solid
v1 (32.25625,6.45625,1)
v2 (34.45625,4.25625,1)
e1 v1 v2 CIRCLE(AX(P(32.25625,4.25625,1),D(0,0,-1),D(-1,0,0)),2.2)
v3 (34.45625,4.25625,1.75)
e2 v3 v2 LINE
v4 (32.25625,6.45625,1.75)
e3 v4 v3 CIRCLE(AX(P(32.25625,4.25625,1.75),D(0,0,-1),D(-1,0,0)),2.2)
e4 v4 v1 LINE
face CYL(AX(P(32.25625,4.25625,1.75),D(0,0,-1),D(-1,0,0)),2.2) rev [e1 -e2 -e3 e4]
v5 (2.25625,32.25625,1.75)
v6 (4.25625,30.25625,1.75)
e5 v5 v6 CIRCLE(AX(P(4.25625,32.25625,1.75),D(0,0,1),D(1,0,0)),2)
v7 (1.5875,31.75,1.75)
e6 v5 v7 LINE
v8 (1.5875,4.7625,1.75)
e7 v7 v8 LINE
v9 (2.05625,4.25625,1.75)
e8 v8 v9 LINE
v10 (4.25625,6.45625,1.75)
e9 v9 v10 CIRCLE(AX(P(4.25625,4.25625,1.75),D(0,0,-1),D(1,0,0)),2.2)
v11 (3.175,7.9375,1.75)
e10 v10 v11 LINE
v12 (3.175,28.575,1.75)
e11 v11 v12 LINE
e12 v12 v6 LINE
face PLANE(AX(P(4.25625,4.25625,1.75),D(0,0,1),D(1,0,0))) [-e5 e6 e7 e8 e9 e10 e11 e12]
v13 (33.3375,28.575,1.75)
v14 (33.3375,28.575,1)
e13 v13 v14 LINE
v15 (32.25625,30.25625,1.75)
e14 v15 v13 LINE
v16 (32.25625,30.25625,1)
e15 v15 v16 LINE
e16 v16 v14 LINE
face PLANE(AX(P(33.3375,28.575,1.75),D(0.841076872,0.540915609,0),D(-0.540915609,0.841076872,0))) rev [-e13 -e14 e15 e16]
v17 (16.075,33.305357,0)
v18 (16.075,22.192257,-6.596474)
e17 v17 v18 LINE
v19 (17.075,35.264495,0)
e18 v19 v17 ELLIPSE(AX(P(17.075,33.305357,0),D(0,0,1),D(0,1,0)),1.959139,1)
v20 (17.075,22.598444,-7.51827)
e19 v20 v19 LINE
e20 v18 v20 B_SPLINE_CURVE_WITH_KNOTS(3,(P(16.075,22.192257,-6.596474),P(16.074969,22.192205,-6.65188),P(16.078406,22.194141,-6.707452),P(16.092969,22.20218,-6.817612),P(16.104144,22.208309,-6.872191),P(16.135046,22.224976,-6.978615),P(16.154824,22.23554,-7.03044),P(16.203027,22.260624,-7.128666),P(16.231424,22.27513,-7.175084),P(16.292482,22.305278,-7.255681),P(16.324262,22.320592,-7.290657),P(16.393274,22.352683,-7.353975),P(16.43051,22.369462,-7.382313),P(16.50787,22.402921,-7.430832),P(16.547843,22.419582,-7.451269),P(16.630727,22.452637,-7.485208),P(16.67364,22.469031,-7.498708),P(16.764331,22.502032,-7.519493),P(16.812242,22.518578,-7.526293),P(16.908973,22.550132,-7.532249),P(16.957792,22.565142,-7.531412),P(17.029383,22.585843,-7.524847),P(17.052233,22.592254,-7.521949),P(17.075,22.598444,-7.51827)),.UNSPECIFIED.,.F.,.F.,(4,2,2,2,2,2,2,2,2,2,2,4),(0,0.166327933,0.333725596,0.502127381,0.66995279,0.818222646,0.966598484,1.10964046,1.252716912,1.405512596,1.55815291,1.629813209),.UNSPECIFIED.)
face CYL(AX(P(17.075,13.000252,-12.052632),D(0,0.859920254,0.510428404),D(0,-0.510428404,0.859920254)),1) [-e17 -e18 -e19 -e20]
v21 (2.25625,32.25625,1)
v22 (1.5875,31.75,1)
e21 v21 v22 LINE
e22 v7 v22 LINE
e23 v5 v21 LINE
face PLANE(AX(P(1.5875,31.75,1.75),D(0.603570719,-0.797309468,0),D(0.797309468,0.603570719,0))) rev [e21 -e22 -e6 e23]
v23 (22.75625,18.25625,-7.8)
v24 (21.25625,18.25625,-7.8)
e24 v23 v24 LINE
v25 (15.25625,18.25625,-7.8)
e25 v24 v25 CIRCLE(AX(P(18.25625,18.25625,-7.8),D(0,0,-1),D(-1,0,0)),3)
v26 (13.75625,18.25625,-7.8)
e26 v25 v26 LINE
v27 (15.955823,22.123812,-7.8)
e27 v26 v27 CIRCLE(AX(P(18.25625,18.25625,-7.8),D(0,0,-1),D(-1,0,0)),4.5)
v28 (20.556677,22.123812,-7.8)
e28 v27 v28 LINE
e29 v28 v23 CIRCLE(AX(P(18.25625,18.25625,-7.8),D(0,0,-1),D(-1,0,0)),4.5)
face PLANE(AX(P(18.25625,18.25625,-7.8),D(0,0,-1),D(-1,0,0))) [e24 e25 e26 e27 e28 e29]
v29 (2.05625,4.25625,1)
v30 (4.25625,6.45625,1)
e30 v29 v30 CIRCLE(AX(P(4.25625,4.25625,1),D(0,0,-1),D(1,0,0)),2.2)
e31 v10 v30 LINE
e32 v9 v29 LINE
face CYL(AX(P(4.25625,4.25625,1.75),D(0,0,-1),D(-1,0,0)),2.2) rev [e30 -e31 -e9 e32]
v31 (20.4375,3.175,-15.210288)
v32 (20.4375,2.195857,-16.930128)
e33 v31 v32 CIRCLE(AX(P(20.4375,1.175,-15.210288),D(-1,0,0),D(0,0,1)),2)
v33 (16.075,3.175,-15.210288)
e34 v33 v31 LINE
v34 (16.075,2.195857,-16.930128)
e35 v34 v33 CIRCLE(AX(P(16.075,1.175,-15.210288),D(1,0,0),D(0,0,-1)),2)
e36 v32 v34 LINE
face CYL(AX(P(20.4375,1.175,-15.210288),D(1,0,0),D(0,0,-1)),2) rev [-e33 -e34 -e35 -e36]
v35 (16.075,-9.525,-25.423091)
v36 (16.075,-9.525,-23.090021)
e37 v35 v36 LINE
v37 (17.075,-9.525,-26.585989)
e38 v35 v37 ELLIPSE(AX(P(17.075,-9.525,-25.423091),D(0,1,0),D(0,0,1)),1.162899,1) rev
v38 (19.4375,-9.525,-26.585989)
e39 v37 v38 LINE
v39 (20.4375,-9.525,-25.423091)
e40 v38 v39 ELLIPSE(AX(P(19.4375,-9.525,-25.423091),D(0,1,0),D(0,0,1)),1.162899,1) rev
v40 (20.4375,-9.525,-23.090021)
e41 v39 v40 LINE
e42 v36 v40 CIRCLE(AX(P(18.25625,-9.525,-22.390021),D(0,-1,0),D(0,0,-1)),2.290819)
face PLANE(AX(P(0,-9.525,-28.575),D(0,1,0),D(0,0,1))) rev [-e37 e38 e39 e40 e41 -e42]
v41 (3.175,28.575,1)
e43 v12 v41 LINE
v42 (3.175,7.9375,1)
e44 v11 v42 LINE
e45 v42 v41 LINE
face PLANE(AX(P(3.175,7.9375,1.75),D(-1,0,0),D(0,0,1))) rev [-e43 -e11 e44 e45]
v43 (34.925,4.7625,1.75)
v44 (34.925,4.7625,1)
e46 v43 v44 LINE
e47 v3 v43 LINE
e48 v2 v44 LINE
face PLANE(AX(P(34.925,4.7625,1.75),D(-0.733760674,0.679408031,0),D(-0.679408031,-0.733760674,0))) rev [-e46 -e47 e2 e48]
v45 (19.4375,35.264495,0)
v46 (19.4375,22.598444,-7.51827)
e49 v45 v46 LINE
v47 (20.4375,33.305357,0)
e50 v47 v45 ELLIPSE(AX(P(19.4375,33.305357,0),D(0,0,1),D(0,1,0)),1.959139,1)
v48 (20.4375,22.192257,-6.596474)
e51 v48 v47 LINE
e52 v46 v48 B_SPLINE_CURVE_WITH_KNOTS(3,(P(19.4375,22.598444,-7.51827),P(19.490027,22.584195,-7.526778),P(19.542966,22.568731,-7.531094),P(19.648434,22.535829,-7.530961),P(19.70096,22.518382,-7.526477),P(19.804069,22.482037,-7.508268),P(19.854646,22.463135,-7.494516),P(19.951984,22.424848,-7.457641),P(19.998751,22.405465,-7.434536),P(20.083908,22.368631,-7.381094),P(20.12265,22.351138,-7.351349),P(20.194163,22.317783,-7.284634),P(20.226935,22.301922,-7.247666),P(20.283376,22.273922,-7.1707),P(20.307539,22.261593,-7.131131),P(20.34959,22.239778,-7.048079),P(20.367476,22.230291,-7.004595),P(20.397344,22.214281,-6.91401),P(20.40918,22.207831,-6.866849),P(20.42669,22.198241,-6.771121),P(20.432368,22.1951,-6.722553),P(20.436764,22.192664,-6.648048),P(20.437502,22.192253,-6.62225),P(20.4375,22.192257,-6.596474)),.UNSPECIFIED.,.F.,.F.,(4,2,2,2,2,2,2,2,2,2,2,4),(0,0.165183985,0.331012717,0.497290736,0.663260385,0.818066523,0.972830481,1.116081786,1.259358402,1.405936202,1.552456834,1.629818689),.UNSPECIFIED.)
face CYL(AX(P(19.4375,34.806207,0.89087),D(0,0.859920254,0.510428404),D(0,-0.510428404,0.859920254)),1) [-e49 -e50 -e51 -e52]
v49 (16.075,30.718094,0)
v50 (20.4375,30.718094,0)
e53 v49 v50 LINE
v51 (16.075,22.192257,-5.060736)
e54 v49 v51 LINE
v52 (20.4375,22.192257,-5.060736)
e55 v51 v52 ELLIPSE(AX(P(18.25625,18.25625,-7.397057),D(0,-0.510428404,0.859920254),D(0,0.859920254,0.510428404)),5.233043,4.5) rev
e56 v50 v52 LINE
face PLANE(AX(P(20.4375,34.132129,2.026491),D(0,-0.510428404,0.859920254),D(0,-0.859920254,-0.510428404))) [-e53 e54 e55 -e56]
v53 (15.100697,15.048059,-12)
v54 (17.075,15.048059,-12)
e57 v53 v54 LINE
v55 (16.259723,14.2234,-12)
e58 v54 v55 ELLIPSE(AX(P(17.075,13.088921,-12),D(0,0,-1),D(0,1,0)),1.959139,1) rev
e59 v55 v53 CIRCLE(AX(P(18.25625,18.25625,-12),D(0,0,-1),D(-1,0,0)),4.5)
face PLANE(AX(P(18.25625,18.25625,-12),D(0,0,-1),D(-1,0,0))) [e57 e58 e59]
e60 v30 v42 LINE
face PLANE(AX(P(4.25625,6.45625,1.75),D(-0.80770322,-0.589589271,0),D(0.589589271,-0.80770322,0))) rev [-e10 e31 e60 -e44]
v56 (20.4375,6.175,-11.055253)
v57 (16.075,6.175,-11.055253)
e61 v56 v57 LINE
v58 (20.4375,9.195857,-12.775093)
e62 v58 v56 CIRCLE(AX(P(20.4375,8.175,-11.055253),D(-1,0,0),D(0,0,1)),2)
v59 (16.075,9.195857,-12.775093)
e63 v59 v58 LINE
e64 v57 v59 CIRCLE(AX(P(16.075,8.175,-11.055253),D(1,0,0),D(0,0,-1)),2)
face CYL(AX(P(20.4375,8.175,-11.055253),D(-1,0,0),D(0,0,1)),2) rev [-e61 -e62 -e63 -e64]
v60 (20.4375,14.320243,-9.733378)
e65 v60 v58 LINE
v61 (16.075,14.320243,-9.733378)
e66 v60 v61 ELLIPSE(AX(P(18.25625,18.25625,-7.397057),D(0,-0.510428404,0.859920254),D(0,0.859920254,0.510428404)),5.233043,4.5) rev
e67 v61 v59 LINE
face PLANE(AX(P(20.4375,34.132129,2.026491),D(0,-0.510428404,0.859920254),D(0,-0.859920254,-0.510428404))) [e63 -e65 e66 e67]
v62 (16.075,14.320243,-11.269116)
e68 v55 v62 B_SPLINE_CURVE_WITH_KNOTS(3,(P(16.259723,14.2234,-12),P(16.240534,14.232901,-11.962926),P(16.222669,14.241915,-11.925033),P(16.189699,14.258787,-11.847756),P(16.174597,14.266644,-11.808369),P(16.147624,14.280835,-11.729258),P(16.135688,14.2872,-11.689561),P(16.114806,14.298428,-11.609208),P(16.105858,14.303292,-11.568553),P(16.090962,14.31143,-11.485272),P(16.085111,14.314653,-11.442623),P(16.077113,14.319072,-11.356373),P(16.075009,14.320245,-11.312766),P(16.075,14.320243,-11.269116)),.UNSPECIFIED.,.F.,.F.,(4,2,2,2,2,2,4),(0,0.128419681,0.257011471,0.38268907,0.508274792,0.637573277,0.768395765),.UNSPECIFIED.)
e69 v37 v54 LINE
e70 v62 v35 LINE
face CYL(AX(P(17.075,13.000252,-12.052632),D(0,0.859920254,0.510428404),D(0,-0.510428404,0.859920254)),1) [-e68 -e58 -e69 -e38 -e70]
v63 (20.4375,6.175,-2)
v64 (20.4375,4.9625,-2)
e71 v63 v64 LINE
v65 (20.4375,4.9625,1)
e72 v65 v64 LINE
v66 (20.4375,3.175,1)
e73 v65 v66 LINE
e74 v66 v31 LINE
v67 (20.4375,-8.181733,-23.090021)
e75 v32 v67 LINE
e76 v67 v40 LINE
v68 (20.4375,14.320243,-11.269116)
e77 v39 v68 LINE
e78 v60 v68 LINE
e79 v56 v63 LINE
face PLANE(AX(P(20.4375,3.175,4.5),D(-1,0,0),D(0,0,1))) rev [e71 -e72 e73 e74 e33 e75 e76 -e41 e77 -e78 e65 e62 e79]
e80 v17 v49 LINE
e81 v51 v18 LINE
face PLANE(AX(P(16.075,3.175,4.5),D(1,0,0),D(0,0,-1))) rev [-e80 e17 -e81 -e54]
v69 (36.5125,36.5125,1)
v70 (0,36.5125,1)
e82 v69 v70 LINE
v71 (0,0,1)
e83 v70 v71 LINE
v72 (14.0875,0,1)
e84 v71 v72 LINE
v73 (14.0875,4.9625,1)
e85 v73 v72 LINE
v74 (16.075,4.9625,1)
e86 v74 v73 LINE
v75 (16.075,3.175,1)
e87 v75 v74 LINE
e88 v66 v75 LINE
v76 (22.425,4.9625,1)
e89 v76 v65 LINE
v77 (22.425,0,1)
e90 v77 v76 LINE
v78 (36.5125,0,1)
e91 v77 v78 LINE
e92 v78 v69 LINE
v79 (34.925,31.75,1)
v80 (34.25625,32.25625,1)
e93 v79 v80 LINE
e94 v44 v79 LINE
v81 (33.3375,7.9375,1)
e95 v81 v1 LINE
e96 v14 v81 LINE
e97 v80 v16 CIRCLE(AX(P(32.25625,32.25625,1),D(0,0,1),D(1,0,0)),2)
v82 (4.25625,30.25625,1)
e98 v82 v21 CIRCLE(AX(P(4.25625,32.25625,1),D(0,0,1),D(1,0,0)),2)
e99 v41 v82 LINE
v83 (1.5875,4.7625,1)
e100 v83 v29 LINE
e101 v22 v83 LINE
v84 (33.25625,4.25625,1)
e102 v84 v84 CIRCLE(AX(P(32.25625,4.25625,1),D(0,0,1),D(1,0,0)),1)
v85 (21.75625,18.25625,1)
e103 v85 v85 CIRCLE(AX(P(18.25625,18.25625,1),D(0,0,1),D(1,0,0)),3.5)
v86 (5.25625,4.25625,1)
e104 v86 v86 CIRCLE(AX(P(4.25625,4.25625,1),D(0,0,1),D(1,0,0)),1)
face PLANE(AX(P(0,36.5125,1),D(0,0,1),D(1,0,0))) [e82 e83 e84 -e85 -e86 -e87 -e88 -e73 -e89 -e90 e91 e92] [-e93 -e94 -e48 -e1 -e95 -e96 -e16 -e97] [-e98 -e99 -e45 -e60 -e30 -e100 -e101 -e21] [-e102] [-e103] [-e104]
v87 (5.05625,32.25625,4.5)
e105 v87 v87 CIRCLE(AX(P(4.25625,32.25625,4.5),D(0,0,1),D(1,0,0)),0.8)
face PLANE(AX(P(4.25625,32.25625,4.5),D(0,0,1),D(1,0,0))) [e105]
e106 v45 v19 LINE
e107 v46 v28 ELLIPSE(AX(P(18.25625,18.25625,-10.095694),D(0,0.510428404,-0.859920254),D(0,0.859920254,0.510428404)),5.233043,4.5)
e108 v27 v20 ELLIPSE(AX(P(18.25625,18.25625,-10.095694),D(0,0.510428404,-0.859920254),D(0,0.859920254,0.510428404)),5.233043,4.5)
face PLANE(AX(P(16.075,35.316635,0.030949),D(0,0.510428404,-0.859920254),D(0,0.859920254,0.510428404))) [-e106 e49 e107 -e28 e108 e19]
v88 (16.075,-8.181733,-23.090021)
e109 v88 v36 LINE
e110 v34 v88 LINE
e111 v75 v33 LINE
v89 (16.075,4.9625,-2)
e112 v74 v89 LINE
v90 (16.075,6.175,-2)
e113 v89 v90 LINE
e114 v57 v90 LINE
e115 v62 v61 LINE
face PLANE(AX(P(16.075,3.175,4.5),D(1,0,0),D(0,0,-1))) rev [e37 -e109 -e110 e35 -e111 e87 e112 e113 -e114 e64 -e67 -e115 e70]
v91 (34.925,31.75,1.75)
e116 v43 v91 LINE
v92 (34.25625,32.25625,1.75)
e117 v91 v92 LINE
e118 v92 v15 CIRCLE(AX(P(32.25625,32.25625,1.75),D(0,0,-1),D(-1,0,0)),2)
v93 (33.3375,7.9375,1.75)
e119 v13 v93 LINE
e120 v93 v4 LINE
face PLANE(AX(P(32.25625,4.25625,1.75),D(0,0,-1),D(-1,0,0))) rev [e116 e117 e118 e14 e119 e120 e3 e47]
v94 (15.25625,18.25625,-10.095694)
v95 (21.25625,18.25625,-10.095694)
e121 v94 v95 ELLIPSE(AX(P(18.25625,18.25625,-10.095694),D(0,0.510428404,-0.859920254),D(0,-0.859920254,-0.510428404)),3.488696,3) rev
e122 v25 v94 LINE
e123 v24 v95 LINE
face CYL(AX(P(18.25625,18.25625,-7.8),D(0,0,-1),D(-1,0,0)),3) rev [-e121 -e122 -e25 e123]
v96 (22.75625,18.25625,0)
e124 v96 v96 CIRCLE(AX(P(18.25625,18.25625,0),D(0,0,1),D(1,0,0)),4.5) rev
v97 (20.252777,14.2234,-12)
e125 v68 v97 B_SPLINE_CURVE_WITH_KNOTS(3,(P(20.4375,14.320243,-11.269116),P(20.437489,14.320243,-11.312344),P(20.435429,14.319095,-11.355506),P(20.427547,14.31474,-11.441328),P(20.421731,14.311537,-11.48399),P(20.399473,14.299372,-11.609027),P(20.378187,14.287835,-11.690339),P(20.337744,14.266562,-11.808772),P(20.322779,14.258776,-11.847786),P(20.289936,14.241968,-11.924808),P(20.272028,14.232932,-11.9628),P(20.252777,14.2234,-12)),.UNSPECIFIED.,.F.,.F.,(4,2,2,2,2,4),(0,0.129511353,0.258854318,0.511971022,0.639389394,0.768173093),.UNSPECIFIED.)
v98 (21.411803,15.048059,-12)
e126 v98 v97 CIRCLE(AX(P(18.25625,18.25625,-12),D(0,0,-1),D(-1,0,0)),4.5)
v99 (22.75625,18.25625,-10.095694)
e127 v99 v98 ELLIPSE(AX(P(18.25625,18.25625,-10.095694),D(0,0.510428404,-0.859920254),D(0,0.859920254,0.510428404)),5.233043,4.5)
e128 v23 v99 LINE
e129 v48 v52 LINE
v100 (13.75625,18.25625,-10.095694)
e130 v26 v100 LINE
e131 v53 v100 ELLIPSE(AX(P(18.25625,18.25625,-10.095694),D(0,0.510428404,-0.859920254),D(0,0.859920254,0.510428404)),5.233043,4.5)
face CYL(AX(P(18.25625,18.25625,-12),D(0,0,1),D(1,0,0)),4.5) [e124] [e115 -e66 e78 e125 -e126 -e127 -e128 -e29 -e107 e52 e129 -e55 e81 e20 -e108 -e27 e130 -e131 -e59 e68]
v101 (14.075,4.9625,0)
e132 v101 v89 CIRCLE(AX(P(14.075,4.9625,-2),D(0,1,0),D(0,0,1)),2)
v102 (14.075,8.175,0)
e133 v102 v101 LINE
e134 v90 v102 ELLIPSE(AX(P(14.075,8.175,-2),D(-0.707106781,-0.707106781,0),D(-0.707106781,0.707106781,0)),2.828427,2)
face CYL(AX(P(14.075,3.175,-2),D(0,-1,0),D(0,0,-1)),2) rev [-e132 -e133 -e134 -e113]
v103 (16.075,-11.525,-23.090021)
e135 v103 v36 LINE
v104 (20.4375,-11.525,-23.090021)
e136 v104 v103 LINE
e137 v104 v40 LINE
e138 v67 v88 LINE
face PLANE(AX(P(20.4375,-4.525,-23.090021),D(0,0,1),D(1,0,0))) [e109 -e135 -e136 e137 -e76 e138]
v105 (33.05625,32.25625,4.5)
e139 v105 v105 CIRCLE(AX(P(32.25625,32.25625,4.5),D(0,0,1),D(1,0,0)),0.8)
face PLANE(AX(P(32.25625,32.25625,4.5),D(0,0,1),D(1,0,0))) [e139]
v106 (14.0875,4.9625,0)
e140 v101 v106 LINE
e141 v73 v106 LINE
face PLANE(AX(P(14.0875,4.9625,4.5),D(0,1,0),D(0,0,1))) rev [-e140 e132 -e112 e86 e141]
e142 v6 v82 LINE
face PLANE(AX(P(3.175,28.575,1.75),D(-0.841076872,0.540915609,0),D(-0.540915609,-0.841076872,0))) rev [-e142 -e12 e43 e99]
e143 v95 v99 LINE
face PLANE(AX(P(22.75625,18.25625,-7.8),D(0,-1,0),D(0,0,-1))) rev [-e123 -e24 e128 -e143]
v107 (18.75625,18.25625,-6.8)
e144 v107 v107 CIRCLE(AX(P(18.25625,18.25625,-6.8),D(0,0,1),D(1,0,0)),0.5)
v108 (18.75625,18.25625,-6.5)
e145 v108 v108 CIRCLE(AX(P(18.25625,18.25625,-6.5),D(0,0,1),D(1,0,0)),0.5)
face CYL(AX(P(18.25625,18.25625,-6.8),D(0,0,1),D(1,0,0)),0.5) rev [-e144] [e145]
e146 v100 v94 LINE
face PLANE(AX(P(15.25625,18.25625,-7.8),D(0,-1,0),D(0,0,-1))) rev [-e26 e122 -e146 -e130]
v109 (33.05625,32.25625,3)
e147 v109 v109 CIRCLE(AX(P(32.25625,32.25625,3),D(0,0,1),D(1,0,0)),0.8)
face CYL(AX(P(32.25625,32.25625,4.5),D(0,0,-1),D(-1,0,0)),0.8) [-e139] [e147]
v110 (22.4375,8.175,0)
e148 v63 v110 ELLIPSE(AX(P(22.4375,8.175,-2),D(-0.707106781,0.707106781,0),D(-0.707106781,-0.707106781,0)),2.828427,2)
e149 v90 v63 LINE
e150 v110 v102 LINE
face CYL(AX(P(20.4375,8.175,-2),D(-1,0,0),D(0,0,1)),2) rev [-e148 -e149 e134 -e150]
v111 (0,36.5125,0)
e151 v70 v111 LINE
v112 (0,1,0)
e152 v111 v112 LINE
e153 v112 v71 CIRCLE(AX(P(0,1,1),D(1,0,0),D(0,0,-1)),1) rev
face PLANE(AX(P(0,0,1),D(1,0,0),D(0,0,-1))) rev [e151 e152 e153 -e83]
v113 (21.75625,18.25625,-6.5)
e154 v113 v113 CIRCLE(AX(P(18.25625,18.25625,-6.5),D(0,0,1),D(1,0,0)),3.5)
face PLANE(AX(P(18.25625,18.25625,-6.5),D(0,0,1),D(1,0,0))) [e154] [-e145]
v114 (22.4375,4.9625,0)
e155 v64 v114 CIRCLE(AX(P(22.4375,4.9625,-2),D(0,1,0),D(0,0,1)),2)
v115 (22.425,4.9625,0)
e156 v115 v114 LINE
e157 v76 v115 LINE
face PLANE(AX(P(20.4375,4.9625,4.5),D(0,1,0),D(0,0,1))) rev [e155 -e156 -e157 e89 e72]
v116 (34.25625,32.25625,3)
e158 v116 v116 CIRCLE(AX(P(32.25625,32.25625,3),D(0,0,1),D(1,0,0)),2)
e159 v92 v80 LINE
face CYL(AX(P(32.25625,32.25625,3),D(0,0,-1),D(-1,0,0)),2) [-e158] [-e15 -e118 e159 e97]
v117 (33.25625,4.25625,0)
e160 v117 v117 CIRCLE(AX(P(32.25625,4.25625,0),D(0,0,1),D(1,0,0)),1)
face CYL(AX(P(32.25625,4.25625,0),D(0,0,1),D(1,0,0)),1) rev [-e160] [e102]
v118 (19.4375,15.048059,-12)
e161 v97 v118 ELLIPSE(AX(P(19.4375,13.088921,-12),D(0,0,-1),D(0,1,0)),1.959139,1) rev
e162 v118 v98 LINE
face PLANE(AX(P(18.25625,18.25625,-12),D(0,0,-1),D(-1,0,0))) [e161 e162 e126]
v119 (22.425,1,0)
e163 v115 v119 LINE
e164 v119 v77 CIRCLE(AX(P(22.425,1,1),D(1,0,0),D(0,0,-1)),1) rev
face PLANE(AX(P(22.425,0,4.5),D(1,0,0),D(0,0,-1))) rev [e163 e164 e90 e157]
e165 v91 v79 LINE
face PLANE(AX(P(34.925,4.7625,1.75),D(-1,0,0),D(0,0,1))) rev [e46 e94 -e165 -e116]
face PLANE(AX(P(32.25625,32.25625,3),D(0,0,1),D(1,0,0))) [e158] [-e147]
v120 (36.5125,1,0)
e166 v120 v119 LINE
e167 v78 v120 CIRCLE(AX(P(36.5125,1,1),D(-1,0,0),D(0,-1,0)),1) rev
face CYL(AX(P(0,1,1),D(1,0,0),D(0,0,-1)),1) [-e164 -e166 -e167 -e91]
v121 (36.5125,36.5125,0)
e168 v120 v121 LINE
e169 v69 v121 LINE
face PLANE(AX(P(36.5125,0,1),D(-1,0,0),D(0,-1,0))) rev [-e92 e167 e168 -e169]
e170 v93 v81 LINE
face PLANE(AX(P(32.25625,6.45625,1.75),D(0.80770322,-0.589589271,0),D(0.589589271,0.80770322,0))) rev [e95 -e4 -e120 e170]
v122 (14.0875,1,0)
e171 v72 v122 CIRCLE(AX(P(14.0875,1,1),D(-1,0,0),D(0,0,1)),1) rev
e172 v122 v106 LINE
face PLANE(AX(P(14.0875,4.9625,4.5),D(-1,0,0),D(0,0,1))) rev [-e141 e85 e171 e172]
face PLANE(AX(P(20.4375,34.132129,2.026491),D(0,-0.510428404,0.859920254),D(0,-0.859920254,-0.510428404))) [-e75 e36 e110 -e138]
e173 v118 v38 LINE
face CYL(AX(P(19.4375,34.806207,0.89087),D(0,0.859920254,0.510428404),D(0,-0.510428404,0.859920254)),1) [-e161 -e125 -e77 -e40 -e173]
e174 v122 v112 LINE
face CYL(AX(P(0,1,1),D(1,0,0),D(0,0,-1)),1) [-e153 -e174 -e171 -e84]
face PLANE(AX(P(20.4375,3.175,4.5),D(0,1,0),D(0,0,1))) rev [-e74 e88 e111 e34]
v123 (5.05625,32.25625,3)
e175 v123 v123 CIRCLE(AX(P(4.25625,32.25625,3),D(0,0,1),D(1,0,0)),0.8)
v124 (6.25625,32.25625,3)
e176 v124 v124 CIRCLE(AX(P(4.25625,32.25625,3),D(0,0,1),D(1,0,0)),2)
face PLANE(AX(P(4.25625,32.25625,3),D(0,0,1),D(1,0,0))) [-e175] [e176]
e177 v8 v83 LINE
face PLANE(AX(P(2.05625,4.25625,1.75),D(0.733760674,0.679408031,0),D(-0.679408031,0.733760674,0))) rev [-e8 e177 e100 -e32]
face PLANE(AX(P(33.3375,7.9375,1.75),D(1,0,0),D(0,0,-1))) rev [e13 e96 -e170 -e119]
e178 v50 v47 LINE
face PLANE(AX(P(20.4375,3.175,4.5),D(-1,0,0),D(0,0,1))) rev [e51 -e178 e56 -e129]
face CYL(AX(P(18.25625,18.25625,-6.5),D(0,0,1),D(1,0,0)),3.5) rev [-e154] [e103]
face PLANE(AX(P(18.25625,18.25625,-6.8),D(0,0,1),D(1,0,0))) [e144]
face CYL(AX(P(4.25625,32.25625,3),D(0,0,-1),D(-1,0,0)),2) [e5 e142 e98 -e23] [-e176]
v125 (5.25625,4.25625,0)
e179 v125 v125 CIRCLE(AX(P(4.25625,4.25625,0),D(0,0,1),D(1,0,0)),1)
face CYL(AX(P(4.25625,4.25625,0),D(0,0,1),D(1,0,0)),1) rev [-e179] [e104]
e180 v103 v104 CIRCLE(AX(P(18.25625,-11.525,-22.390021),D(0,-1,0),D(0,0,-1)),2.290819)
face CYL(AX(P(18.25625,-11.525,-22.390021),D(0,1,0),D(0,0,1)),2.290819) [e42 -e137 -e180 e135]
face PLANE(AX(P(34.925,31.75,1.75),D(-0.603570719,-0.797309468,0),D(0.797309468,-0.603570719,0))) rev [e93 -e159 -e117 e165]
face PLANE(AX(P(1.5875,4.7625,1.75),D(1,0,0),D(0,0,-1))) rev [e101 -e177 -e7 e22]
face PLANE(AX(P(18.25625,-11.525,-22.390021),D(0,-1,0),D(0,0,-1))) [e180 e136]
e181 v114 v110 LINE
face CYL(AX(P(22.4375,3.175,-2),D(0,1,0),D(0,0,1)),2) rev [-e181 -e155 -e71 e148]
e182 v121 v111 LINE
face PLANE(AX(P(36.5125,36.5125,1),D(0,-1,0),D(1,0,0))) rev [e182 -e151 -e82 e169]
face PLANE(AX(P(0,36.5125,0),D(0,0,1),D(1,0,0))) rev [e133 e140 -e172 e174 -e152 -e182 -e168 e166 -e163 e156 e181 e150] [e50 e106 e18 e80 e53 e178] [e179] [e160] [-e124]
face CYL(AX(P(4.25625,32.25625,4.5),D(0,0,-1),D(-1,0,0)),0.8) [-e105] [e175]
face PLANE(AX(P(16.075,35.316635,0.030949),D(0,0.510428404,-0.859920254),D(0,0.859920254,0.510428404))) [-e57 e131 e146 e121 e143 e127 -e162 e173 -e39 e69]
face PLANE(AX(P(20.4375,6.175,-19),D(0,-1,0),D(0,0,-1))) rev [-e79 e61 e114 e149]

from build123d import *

# Parameters (mm, degrees)
EXTRUDE1_DEPTH       = 1
SKETCH2_R            = 2.0000000000000036
SKETCH2_R_2          = 2.000000000000001
EXTRUDE2_DEPTH       = 2
EXTRUDE3_DEPTH       = 0.75
SKETCH4_R            = 0.9999999999999981
SKETCH4_R_2          = 0.9999999999999998
EXTRUDE4_DEPTH       = 52.67519049311769
SKETCH5_R            = 0.800000000000003
SKETCH5_R_2          = 0.8000000000000015
EXTRUDE5_DEPTH       = 1.5
EXTRUDE6_DEPTH       = 52.83218413785011
SKETCH7_W            = 4.362500000000001
SKETCH7_H            = 3.0000000000000013
EXTRUDE7_DEPTH       = 19
EXTRUDE8_DEPTH       = 46.95491336625498
EXTRUDE9_DEPTH       = 17
EXTRUDE9_DEPTH_BACK  = 36
SKETCH9_W            = 4.362500000000001
SKETCH9_H            = 2.3206120824820307
SKETCH10_W           = 6.349999999999998
SKETCH10_H           = 3.475000000000003
EXTRUDE10_DEPTH      = 50.80993243420719
SKETCH11_R           = 4.500000000000002
EXTRUDE11_DEPTH      = 12
EXTRUDE12_START      = -4.2
EXTRUDE12_DEPTH      = 4.2
EXTRUDE13_DEPTH      = 4.5
EXTRUDE13_DEPTH_BACK = 50.57488155832686
SKETCH15_R           = 3.4999999999999996
EXTRUDE14_DEPTH      = 7.5
SKETCH16_R           = 0.49999999999999917
EXTRUDE15_DEPTH      = 0.3
EXTRUDE16_DEPTH      = 2
EXTRUDE17_DEPTH      = 5
EXTRUDE18_DEPTH      = 50.574881558326865
FILLET2_R            = 1
FILLET3_R            = 2
EXTRUDE19_DEPTH      = 4.3625


with BuildPart() as part:
    # Sketch1 → Extrude1 (new body)
    with BuildSketch(Plane.XY):
        Polygon((0, 0), (36.5125, 0), (36.512499999999996, 36.512499999999996), (0, 36.5125), align=None)
    extrude(amount=EXTRUDE1_DEPTH)

    # Sketch2 → Extrude2 (add)
    with BuildSketch(Plane.XY.offset(1)):
        with Locations((32.25625, 32.25625)):
            Circle(SKETCH2_R)
        with Locations((4.25625, 32.25625)):
            Circle(SKETCH2_R_2)
    extrude(amount=EXTRUDE2_DEPTH)

    # Sketch3 → Extrude3 (add)
    with BuildSketch(Plane.XY.offset(1)):
        with BuildLine():
            Line((1.5875, 4.762499999999999), (1.5875, 31.75))
            Line((1.5875, 31.75), (2.256249999999998, 32.25625))
            Line((2.256249999999998, 32.25625), (4.25625, 30.256249999999998))
            Line((4.25625, 30.256249999999998), (3.175, 28.575))
            Line((3.175, 28.575), (3.175, 7.9375))
            Line((3.175, 7.9375), (4.256250000000003, 6.456250000000007))
            ThreePointArc((4.256250000000003, 6.456250000000007), (2.7006150813895986, 5.811884918610412), (2.0562500000000026, 4.256250000000007))
            Line((2.0562500000000026, 4.256250000000007), (1.5875, 4.762499999999999))
        make_face()
        with BuildLine():
            Line((34.925, 4.762499999999999), (34.925, 31.75))
            Line((34.925, 31.75), (34.25625, 32.25625))
            Line((34.25625, 32.25625), (32.25625, 30.256249999999998))
            Line((32.25625, 30.256249999999998), (33.3375, 28.575))
            Line((33.3375, 28.575), (33.3375, 7.9375))
            Line((33.3375, 7.9375), (32.25625000000001, 6.456249999999997))
            ThreePointArc((32.25625000000001, 6.456249999999997), (33.81188491861041, 5.811884918610402), (34.456250000000004, 4.256249999999998))
            Line((34.456250000000004, 4.256249999999998), (34.925, 4.762499999999999))
        make_face()
    extrude(amount=EXTRUDE3_DEPTH)

    # Sketch4 → Extrude4 (cut, through all)
    with BuildSketch(Plane.XY.offset(1)):
        with Locations((32.25625, 4.256249999999997)):
            Circle(SKETCH4_R)
        with Locations((4.256250000000007, 4.256250000000004)):
            Circle(SKETCH4_R_2)
    extrude(amount=-EXTRUDE4_DEPTH, mode=Mode.SUBTRACT)

    # Sketch5 → Extrude5 (add)
    with BuildSketch(Plane.XY.offset(3)):
        with Locations((32.25625, 32.25625)):
            Circle(SKETCH5_R)
        with Locations((4.25625, 32.25625)):
            Circle(SKETCH5_R_2)
    extrude(amount=EXTRUDE5_DEPTH)

    # Sketch6 → Extrude6 (cut, through all)
    with BuildSketch(Plane(origin=(0, 0, 0), x_dir=(-1, 0, 0), z_dir=(0, 0, -1))):
        Polygon((-22.425, 0), (-22.425, 4.9625), (-20.4375, 4.9625), (-20.4375, 3.175), (-16.075, 3.175), (-16.075, 4.9625), (-14.0875, 4.9625), (-14.0875, 0), align=None)
    extrude(amount=-EXTRUDE6_DEPTH, mode=Mode.SUBTRACT)

    # Sketch7 → Extrude7 (add)
    with BuildSketch(Plane(origin=(0, 0, 0), x_dir=(-1, 0, 0), z_dir=(0, 0, -1))):
        with Locations((-18.25625, 4.675)):
            Rectangle(SKETCH7_W, SKETCH7_H)
    extrude(amount=EXTRUDE7_DEPTH)

    # Sketch8 → Extrude8 (cut, through all)
    with BuildSketch(Plane(origin=(20.4375, 0, 0), x_dir=(0, 0, -1), z_dir=(1, 0, 0))):
        Polygon((19, 4.748611530779532), (19, 0), (11, -9.8e-16), align=None)
    extrude(amount=-EXTRUDE8_DEPTH, mode=Mode.SUBTRACT)

    # Sketch9 → Extrude9 (add, two sides: drawn at the far end of the back side and taken through both)
    with BuildSketch(Plane(origin=(0, -4.828204957496708, -2.8659087167669712), x_dir=(1, 0, 0), z_dir=(0, -0.8599202544016947, -0.5104284044503447)).offset(-EXTRUDE9_DEPTH_BACK)):
        with Locations((18.25625, -16.839693958758986)):
            Rectangle(SKETCH9_W, SKETCH9_H)
    extrude(amount=EXTRUDE9_DEPTH + EXTRUDE9_DEPTH_BACK)

    # Sketch10 → Extrude10 (cut, through all)
    with BuildSketch(Plane(origin=(20.4375, 0, 0), x_dir=(0, 0, -1), z_dir=(1, 0, 0))):
        with Locations((25.4, -11.2625)):
            Rectangle(SKETCH10_W, SKETCH10_H)
    extrude(amount=-EXTRUDE10_DEPTH, mode=Mode.SUBTRACT)

    # Sketch11 → Extrude11 (add)
    with BuildSketch(Plane(origin=(0, 0, 0), x_dir=(-1, 0, 0), z_dir=(0, 0, -1))):
        with Locations(Location((-18.25625, 18.25625, 0), (0, 0, 180))):
            Circle(SKETCH11_R)
    extrude(amount=EXTRUDE11_DEPTH)

    # Sketch12 → Extrude12 (cut)
    with BuildSketch(Plane(origin=(0, 0, -12), x_dir=(-1, 0, 0), z_dir=(0, 0, -1)).offset(EXTRUDE12_START)):
        with BuildLine():
            Line((-22.75625, 18.25625), (-21.25625, 18.25625))
            ThreePointArc((-21.25625, 18.25625), (-18.25625, 15.256250000000001), (-15.256250000000003, 18.25625))
            Line((-15.256250000000003, 18.25625), (-13.756250000000001, 18.25625))
            ThreePointArc((-13.756250000000001, 18.25625), (-18.25625, 22.75625), (-22.75625, 18.25625))
        make_face()
    extrude(amount=EXTRUDE12_DEPTH, mode=Mode.SUBTRACT)

    # Sketch13 → Extrude13 (cut, two sides: drawn at the far end of the back side and taken through both)
    with BuildSketch(Plane.ZY.offset(-16.075).offset(-EXTRUDE13_DEPTH_BACK)):
        Polygon((-6.511482510112533, 24.294581169959557), (-19.744999641447297, 2.000035413908037), (-19.744999641447297, 23.38214880236955), align=None)
    extrude(amount=EXTRUDE13_DEPTH + EXTRUDE13_DEPTH_BACK, mode=Mode.SUBTRACT)

    # Sketch15 → Extrude14 (cut)
    with BuildSketch(Plane.XY.offset(1)):
        with Locations((18.256250000000005, 18.256249999999998)):
            Circle(SKETCH15_R)
    extrude(amount=-EXTRUDE14_DEPTH, mode=Mode.SUBTRACT)

    # Sketch16 → Extrude15 (cut)
    with BuildSketch(Plane.XY.offset(-6.5)):
        with Locations((18.256250000000005, 18.256249999999998)):
            Circle(SKETCH16_R)
    extrude(amount=-EXTRUDE15_DEPTH, mode=Mode.SUBTRACT)



with BuildPart() as body_2:
    # Sketch17 → Extrude16 (new body)
    with BuildSketch(Plane.XZ.offset(9.524999999999999)):
        with BuildLine():
            Line((16.075, -23.090021330000003), (20.43750000000001, -23.090021330000003))
            ThreePointArc((20.43750000000001, -23.090021330000003), (18.256250000000005, -24.680840302005432), (16.075, -23.090021330000003))
        make_face()
    extrude(amount=EXTRUDE16_DEPTH)


with BuildPart() as part_1:
    add(part.part)

    add(body_2.part)  # Extrude17 merges body 2
    # Sketch18 → Extrude17 (add)
    with BuildSketch(Plane.XZ.offset(9.524999999999999)):
        Polygon((20.4375, -26.585989148838085), (20.43750000000001, -23.090021330000003), (16.075, -23.090021330000003), (16.075, -26.585989148838067), align=None)
    extrude(amount=-EXTRUDE17_DEPTH)

    # Sketch19 → Extrude18 (cut, through all)
    with BuildSketch(Plane(origin=(20.4375, 0, 0), x_dir=(0, 0, -1), z_dir=(1, 0, 0))):
        Polygon((19.073875811639994, 3.1306797303903946), (28.233881236807996, -12.301208712443408), (26.987499999999997, 3.175), align=None)
    extrude(amount=-EXTRUDE18_DEPTH, mode=Mode.SUBTRACT)

    # Fillet2
    # the kernel refuses this fillet: 1 mm, written as the material it adds along each edge
    # the kernel refuses this fillet: 1 mm, written as the material it takes off along each edge
    with BuildSketch(Plane(origin=(20.4375, 37.41429579940197, 1.276071011125861), x_dir=(-1, 3.9e-16, -6.6e-16), z_dir=(0, -0.8599202544016947, -0.5104284044503447))) as fillet2_2_piece_1_section:
        with BuildLine():
            CenterArc((FILLET2_R, -FILLET2_R), FILLET2_R, 89.99999999999996, 90.00000000000004)
            Line((-7.6e-16, -FILLET2_R), (0, 0))
            Line((0, 0), (FILLET2_R, 0))
        make_face()
    fillet2_2_piece_1 = extrude(amount=20.201686941576707, mode=Mode.PRIVATE)
    fillet2_2_piece_1 = fillet2_2_piece_1 - Plane(origin=(18.25625, 18.25625, -3.719487520813402), x_dir=(1, 1.2e-16, 0), z_dir=(0, 0, 1)) * Cylinder(4.500000000000002, 45, mode=Mode.PRIVATE)
    fillet2_2_piece_1 = split(fillet2_2_piece_1, bisect_by=Plane(origin=(20.212177439372237, 28.569917833815104, 0), z_dir=(0, 0, -1)), keep=Keep.TOP, mode=Mode.PRIVATE)
    add(fillet2_2_piece_1, mode=Mode.SUBTRACT)
    with BuildSketch(Plane(origin=(20.4375, -11.674800636004225, -27.86206015996393), x_dir=(0, -0.5104284044503445, 0.8599202544016947), z_dir=(0, 0.8599202544016948, 0.5104284044503447))) as fillet2_2_piece_2_section:
        with BuildLine():
            CenterArc((FILLET2_R, -FILLET2_R), FILLET2_R, 90, 90)
            Line((-2.15e-15, -FILLET2_R), (0, 0))
            Line((0, 0), (FILLET2_R, 0))
        make_face()
    fillet2_2_piece_2 = extrude(amount=33.575974655142886, mode=Mode.PRIVATE)
    fillet2_2_piece_2 = split(fillet2_2_piece_2, bisect_by=Plane(origin=(20.21436970343455, 2.314941596078876, -12), z_dir=(0, 0, -1)), keep=Keep.TOP, mode=Mode.PRIVATE)
    add(fillet2_2_piece_2, mode=Mode.SUBTRACT)
    with BuildSketch(Plane(origin=(20.4375, -11.674800636004225, -27.86206015996393), x_dir=(0, -0.5104284044503445, 0.8599202544016947), z_dir=(0, 0.8599202544016948, 0.5104284044503447))) as fillet2_2_piece_3_section:
        with BuildLine():
            CenterArc((FILLET2_R, -FILLET2_R), FILLET2_R, 90, 90)
            Line((-2.15e-15, -FILLET2_R), (0, 0))
            Line((0, 0), (FILLET2_R, 0))
        make_face()
    fillet2_2_piece_3 = extrude(amount=33.575974655142886, mode=Mode.PRIVATE)
    fillet2_2_piece_3 = fillet2_2_piece_3 - Plane(origin=(18.25625, 18.25625, -11.853054831644428), x_dir=(1, 1.2e-16, 0), z_dir=(0, 0, 1)) * Cylinder(4.500000000000002, 72, mode=Mode.PRIVATE)
    add(fillet2_2_piece_3, mode=Mode.SUBTRACT)
    with BuildSketch(Plane(origin=(16.075, 37.41429579940197, 1.276071011125861), x_dir=(1, 3.9e-16, -6.6e-16), z_dir=(0, -0.8599202544016947, -0.5104284044503447))) as fillet2_2_piece_4_section:
        with BuildLine():
            CenterArc((FILLET2_R, FILLET2_R), FILLET2_R, 180, 90.00000000000006)
            Line((-7.6e-16, FILLET2_R), (0, 0))
            Line((0, 0), (FILLET2_R, 0))
        make_face()
    fillet2_2_piece_4 = extrude(amount=20.201686941576707, mode=Mode.PRIVATE)
    fillet2_2_piece_4 = fillet2_2_piece_4 - Plane(origin=(18.25625, 18.25625, -3.71949003584698), x_dir=(1, 1.2e-16, 0), z_dir=(0, 0, 1)) * Cylinder(4.500000000000002, 45, mode=Mode.PRIVATE)
    fillet2_2_piece_4 = split(fillet2_2_piece_4, bisect_by=Plane(origin=(16.300322795564288, 28.56991314804096, 0), z_dir=(0, 0, -1)), keep=Keep.TOP, mode=Mode.PRIVATE)
    add(fillet2_2_piece_4, mode=Mode.SUBTRACT)
    with BuildSketch(Plane(origin=(16.075, 17.197860031231095, -10.723928988874135), x_dir=(0, -0.5104284044503445, 0.8599202544016947), z_dir=(0, -0.8599202544016948, -0.5104284044503447))) as fillet2_2_piece_5_section:
        with BuildLine():
            CenterArc((FILLET2_R, -FILLET2_R), FILLET2_R, 90, 90)
            Line((-2.9e-16, -FILLET2_R), (0, 0))
            Line((0, 0), (FILLET2_R, 0))
        make_face()
    fillet2_2_piece_5 = extrude(amount=33.5759746551429, mode=Mode.PRIVATE)
    fillet2_2_piece_5 = split(fillet2_2_piece_5, bisect_by=Plane(origin=(16.399463784438982, 14.506186202544315, -12), z_dir=(0, 0, -1)), keep=Keep.TOP, mode=Mode.PRIVATE)
    add(fillet2_2_piece_5, mode=Mode.SUBTRACT)
    with BuildSketch(Plane(origin=(16.075, 17.197860031231095, -10.723928988874135), x_dir=(0, -0.5104284044503445, 0.8599202544016947), z_dir=(0, -0.8599202544016948, -0.5104284044503447))) as fillet2_2_piece_6_section:
        with BuildLine():
            CenterArc((FILLET2_R, -FILLET2_R), FILLET2_R, 90, 90)
            Line((-2.9e-16, -FILLET2_R), (0, 0))
            Line((0, 0), (FILLET2_R, 0))
        make_face()
    fillet2_2_piece_6 = extrude(amount=33.5759746551429, mode=Mode.PRIVATE)
    fillet2_2_piece_6 = fillet2_2_piece_6 - Plane(origin=(18.25625, 18.25625, -11.853054833536454), x_dir=(1, 1.2e-16, 0), z_dir=(0, 0, 1)) * Cylinder(4.500000000000002, 72, mode=Mode.PRIVATE)
    add(fillet2_2_piece_6, mode=Mode.SUBTRACT)
    with BuildSketch(Plane(origin=(-2.5000000000000004, 0, 0), x_dir=(0, 0, 1), z_dir=(1, 0, 0)), Plane(origin=(19.925, 0, 0), x_dir=(0, 0, 1), z_dir=(1, 0, 0))) as fillet2_2_piece_7:
        with BuildLine():
            CenterArc((FILLET2_R, -FILLET2_R), FILLET2_R, 90, 90)
            Line((-1.1e-16, -FILLET2_R), (0, 0))
            Line((0, 0), (FILLET2_R, 0))
        make_face()
    extrude(amount=19.087500000000002, mode=Mode.SUBTRACT)

    # Fillet3
    # the kernel refuses this fillet: 2 mm, written as the material it adds along each edge
    with BuildSketch(Plane(origin=(16.075, 4.9625, 0), x_dir=(0, 0, -1), z_dir=(0, 1, 0)), Plane(origin=(20.4375, 6.175, 0), x_dir=(0, 0, -1), z_dir=(0, -1, 0))) as fillet3_piece_1:
        with BuildLine():
            CenterArc((FILLET3_R, FILLET3_R), FILLET3_R, 180, 90)
            Line((-2.2e-16, FILLET3_R), (-FILLET3_R * 0.02, FILLET3_R))
            Line((-FILLET3_R * 0.02, FILLET3_R), (-FILLET3_R * 0.02, -FILLET3_R * 0.02))
            Line((-FILLET3_R * 0.02, -FILLET3_R * 0.02), (FILLET3_R, -FILLET3_R * 0.02))
            Line((FILLET3_R, -FILLET3_R * 0.02), (FILLET3_R, 0))
        make_face()
    extrude(amount=1.2124999999999995)
    with BuildSketch(Plane(origin=(16.075, 6.175, 0), x_dir=(0, 1, 0), z_dir=(1, 0, 0))) as fillet3_piece_2:
        with BuildLine():
            CenterArc((FILLET3_R, -FILLET3_R), FILLET3_R, 90, 90)
            Line((-8.9e-16, -FILLET3_R), (-FILLET3_R * 0.02, -FILLET3_R))
            Line((-FILLET3_R * 0.02, -FILLET3_R), (-FILLET3_R * 0.02, FILLET3_R * 0.02))
            Line((-FILLET3_R * 0.02, FILLET3_R * 0.02), (FILLET3_R, FILLET3_R * 0.02))
            Line((FILLET3_R, FILLET3_R * 0.02), (FILLET3_R, 0))
        make_face()
    extrude(amount=4.362500000000001)
    with BuildSketch(Plane(origin=(16.075, 3.175000000000001, -16.34893196366189), x_dir=(0, -1.17e-15, 1), z_dir=(1, 0, 0))) as fillet3_piece_3:
        with BuildLine():
            CenterArc((FILLET3_R * 0.569322088931, FILLET3_R), FILLET3_R, 210.69236976062953, 59.30763023937038)
            Line((-FILLET3_R * 0.290598165471, FILLET3_R * 0.48957159555), (-FILLET3_R * 0.307796570559, FILLET3_R * 0.479363027461))
            Line((-FILLET3_R * 0.307796570559, FILLET3_R * 0.479363027461), (-FILLET3_R * 0.0113864417786, -FILLET3_R * 0.02))
            Line((-FILLET3_R * 0.0113864417786, -FILLET3_R * 0.02), (FILLET3_R * 0.569322088931, -FILLET3_R * 0.02))
            Line((FILLET3_R * 0.569322088931, -FILLET3_R * 0.02), (FILLET3_R * 0.569322088931, 0))
        make_face()
    extrude(amount=4.362500000000001)
    with BuildSketch(Plane(origin=(20.4375, 6.175000000000001, -14.568202639619555), x_dir=(0, 0.8599202544016946, 0.5104284044503449), z_dir=(-1, 0, 0))) as fillet3_piece_4:
        with BuildLine():
            CenterArc((FILLET3_R * 1.75647497163, -FILLET3_R), FILLET3_R, 90.00000000000006, 120.6923697606295)
            Line((FILLET3_R * 0.896554717224, -FILLET3_R * 1.51042840445), (FILLET3_R * 0.879356312136, -FILLET3_R * 1.52063697254))
            Line((FILLET3_R * 0.879356312136, -FILLET3_R * 1.52063697254), (-FILLET3_R * 0.017198405088, -FILLET3_R * 0.010208568089))
            Line((-FILLET3_R * 0.017198405088, -FILLET3_R * 0.010208568089), (1.4e-16, FILLET3_R * 0.02))
            Line((1.4e-16, FILLET3_R * 0.02), (FILLET3_R * 1.75647497163, FILLET3_R * 0.02))
            Line((FILLET3_R * 1.75647497163, FILLET3_R * 0.02), (FILLET3_R * 1.75647497163, 0))
        make_face()
    extrude(amount=4.362500000000001)
    with BuildSketch(Plane(origin=(16.075, 4.9625, 0), x_dir=(0, 0, -1), z_dir=(0, 1, 0))) as fillet3_piece_5a_section:
        with BuildLine():
            CenterArc((FILLET3_R, FILLET3_R), FILLET3_R, 180, 90)
            Line((-2.2e-16, FILLET3_R), (-FILLET3_R * 0.02, FILLET3_R))
            Line((-FILLET3_R * 0.02, FILLET3_R), (-FILLET3_R * 0.02, -FILLET3_R * 0.02))
            Line((-FILLET3_R * 0.02, -FILLET3_R * 0.02), (FILLET3_R, -FILLET3_R * 0.02))
            Line((FILLET3_R, -FILLET3_R * 0.02), (FILLET3_R, 0))
        make_face()
    fillet3_piece_5a = extrude(amount=6.2125, mode=Mode.PRIVATE)
    fillet3_piece_5a = split(fillet3_piece_5a, bisect_by=Plane(origin=(15.622209771466347, 6.175, -0.45279022853364964), z_dir=(0, 1, 0)), keep=Keep.TOP, mode=Mode.PRIVATE)
    with BuildSketch(Plane(origin=(11.075, 6.175000000000001, 0), x_dir=(0, 1, 0), z_dir=(1, 0, 0))) as fillet3_piece_5b_section:
        with BuildLine():
            CenterArc((FILLET3_R, -FILLET3_R), FILLET3_R, 90, 90)
            Line((0, -FILLET3_R), (-FILLET3_R * 0.02, -FILLET3_R))
            Line((-FILLET3_R * 0.02, -FILLET3_R), (-FILLET3_R * 0.02, FILLET3_R * 0.02))
            Line((-FILLET3_R * 0.02, FILLET3_R * 0.02), (FILLET3_R, FILLET3_R * 0.02))
            Line((FILLET3_R, FILLET3_R * 0.02), (FILLET3_R, 0))
        make_face()
    fillet3_piece_5b = extrude(amount=9.3625, mode=Mode.PRIVATE)
    fillet3_piece_5b = split(fillet3_piece_5b, bisect_by=Plane(origin=(16.075, 6.627790228533651, -0.4527902285336509), z_dir=(-1, 0, 0)), keep=Keep.TOP, mode=Mode.PRIVATE)
    fillet3_piece_5 = fillet3_piece_5a & fillet3_piece_5b
    add(fillet3_piece_5)
    with BuildSketch(Plane(origin=(20.4375, 11.175, 0), x_dir=(0, 0, -1), z_dir=(0, -1, 0))) as fillet3_piece_6a_section:
        with BuildLine():
            CenterArc((FILLET3_R, FILLET3_R), FILLET3_R, 180, 90)
            Line((-2.2e-16, FILLET3_R), (-FILLET3_R * 0.02, FILLET3_R))
            Line((-FILLET3_R * 0.02, FILLET3_R), (-FILLET3_R * 0.02, -FILLET3_R * 0.02))
            Line((-FILLET3_R * 0.02, -FILLET3_R * 0.02), (FILLET3_R, -FILLET3_R * 0.02))
            Line((FILLET3_R, -FILLET3_R * 0.02), (FILLET3_R, 0))
        make_face()
    fillet3_piece_6a = extrude(amount=6.2125, mode=Mode.PRIVATE)
    fillet3_piece_6a = split(fillet3_piece_6a, bisect_by=Plane(origin=(20.89029022853365, 6.175, -0.45279022853364964), z_dir=(0, 1, 0)), keep=Keep.TOP, mode=Mode.PRIVATE)
    with BuildSketch(Plane(origin=(16.075, 6.175, 0), x_dir=(0, 1, 0), z_dir=(1, 0, 0))) as fillet3_piece_6b_section:
        with BuildLine():
            CenterArc((FILLET3_R, -FILLET3_R), FILLET3_R, 90, 90)
            Line((-8.9e-16, -FILLET3_R), (-FILLET3_R * 0.02, -FILLET3_R))
            Line((-FILLET3_R * 0.02, -FILLET3_R), (-FILLET3_R * 0.02, FILLET3_R * 0.02))
            Line((-FILLET3_R * 0.02, FILLET3_R * 0.02), (FILLET3_R, FILLET3_R * 0.02))
            Line((FILLET3_R, FILLET3_R * 0.02), (FILLET3_R, 0))
        make_face()
    fillet3_piece_6b = extrude(amount=9.3625, mode=Mode.PRIVATE)
    fillet3_piece_6b = split(fillet3_piece_6b, bisect_by=Plane(origin=(20.4375, 6.627790228533651, -0.4527902285336507), z_dir=(1, 0, 0)), keep=Keep.TOP, mode=Mode.PRIVATE)
    fillet3_piece_6 = fillet3_piece_6a & fillet3_piece_6b
    add(fillet3_piece_6)

    # Sketch20 → Extrude19 (cut)
    with BuildSketch(Plane.ZY.offset(-16.075)):
        Polygon((0.9999999999999991, 34.74142979383808), (1, 32.40279739081142), (2.0264905965505267, 34.13212915846101), align=None)
    extrude(amount=-EXTRUDE19_DEPTH, mode=Mode.SUBTRACT)


solid = part_1.part
